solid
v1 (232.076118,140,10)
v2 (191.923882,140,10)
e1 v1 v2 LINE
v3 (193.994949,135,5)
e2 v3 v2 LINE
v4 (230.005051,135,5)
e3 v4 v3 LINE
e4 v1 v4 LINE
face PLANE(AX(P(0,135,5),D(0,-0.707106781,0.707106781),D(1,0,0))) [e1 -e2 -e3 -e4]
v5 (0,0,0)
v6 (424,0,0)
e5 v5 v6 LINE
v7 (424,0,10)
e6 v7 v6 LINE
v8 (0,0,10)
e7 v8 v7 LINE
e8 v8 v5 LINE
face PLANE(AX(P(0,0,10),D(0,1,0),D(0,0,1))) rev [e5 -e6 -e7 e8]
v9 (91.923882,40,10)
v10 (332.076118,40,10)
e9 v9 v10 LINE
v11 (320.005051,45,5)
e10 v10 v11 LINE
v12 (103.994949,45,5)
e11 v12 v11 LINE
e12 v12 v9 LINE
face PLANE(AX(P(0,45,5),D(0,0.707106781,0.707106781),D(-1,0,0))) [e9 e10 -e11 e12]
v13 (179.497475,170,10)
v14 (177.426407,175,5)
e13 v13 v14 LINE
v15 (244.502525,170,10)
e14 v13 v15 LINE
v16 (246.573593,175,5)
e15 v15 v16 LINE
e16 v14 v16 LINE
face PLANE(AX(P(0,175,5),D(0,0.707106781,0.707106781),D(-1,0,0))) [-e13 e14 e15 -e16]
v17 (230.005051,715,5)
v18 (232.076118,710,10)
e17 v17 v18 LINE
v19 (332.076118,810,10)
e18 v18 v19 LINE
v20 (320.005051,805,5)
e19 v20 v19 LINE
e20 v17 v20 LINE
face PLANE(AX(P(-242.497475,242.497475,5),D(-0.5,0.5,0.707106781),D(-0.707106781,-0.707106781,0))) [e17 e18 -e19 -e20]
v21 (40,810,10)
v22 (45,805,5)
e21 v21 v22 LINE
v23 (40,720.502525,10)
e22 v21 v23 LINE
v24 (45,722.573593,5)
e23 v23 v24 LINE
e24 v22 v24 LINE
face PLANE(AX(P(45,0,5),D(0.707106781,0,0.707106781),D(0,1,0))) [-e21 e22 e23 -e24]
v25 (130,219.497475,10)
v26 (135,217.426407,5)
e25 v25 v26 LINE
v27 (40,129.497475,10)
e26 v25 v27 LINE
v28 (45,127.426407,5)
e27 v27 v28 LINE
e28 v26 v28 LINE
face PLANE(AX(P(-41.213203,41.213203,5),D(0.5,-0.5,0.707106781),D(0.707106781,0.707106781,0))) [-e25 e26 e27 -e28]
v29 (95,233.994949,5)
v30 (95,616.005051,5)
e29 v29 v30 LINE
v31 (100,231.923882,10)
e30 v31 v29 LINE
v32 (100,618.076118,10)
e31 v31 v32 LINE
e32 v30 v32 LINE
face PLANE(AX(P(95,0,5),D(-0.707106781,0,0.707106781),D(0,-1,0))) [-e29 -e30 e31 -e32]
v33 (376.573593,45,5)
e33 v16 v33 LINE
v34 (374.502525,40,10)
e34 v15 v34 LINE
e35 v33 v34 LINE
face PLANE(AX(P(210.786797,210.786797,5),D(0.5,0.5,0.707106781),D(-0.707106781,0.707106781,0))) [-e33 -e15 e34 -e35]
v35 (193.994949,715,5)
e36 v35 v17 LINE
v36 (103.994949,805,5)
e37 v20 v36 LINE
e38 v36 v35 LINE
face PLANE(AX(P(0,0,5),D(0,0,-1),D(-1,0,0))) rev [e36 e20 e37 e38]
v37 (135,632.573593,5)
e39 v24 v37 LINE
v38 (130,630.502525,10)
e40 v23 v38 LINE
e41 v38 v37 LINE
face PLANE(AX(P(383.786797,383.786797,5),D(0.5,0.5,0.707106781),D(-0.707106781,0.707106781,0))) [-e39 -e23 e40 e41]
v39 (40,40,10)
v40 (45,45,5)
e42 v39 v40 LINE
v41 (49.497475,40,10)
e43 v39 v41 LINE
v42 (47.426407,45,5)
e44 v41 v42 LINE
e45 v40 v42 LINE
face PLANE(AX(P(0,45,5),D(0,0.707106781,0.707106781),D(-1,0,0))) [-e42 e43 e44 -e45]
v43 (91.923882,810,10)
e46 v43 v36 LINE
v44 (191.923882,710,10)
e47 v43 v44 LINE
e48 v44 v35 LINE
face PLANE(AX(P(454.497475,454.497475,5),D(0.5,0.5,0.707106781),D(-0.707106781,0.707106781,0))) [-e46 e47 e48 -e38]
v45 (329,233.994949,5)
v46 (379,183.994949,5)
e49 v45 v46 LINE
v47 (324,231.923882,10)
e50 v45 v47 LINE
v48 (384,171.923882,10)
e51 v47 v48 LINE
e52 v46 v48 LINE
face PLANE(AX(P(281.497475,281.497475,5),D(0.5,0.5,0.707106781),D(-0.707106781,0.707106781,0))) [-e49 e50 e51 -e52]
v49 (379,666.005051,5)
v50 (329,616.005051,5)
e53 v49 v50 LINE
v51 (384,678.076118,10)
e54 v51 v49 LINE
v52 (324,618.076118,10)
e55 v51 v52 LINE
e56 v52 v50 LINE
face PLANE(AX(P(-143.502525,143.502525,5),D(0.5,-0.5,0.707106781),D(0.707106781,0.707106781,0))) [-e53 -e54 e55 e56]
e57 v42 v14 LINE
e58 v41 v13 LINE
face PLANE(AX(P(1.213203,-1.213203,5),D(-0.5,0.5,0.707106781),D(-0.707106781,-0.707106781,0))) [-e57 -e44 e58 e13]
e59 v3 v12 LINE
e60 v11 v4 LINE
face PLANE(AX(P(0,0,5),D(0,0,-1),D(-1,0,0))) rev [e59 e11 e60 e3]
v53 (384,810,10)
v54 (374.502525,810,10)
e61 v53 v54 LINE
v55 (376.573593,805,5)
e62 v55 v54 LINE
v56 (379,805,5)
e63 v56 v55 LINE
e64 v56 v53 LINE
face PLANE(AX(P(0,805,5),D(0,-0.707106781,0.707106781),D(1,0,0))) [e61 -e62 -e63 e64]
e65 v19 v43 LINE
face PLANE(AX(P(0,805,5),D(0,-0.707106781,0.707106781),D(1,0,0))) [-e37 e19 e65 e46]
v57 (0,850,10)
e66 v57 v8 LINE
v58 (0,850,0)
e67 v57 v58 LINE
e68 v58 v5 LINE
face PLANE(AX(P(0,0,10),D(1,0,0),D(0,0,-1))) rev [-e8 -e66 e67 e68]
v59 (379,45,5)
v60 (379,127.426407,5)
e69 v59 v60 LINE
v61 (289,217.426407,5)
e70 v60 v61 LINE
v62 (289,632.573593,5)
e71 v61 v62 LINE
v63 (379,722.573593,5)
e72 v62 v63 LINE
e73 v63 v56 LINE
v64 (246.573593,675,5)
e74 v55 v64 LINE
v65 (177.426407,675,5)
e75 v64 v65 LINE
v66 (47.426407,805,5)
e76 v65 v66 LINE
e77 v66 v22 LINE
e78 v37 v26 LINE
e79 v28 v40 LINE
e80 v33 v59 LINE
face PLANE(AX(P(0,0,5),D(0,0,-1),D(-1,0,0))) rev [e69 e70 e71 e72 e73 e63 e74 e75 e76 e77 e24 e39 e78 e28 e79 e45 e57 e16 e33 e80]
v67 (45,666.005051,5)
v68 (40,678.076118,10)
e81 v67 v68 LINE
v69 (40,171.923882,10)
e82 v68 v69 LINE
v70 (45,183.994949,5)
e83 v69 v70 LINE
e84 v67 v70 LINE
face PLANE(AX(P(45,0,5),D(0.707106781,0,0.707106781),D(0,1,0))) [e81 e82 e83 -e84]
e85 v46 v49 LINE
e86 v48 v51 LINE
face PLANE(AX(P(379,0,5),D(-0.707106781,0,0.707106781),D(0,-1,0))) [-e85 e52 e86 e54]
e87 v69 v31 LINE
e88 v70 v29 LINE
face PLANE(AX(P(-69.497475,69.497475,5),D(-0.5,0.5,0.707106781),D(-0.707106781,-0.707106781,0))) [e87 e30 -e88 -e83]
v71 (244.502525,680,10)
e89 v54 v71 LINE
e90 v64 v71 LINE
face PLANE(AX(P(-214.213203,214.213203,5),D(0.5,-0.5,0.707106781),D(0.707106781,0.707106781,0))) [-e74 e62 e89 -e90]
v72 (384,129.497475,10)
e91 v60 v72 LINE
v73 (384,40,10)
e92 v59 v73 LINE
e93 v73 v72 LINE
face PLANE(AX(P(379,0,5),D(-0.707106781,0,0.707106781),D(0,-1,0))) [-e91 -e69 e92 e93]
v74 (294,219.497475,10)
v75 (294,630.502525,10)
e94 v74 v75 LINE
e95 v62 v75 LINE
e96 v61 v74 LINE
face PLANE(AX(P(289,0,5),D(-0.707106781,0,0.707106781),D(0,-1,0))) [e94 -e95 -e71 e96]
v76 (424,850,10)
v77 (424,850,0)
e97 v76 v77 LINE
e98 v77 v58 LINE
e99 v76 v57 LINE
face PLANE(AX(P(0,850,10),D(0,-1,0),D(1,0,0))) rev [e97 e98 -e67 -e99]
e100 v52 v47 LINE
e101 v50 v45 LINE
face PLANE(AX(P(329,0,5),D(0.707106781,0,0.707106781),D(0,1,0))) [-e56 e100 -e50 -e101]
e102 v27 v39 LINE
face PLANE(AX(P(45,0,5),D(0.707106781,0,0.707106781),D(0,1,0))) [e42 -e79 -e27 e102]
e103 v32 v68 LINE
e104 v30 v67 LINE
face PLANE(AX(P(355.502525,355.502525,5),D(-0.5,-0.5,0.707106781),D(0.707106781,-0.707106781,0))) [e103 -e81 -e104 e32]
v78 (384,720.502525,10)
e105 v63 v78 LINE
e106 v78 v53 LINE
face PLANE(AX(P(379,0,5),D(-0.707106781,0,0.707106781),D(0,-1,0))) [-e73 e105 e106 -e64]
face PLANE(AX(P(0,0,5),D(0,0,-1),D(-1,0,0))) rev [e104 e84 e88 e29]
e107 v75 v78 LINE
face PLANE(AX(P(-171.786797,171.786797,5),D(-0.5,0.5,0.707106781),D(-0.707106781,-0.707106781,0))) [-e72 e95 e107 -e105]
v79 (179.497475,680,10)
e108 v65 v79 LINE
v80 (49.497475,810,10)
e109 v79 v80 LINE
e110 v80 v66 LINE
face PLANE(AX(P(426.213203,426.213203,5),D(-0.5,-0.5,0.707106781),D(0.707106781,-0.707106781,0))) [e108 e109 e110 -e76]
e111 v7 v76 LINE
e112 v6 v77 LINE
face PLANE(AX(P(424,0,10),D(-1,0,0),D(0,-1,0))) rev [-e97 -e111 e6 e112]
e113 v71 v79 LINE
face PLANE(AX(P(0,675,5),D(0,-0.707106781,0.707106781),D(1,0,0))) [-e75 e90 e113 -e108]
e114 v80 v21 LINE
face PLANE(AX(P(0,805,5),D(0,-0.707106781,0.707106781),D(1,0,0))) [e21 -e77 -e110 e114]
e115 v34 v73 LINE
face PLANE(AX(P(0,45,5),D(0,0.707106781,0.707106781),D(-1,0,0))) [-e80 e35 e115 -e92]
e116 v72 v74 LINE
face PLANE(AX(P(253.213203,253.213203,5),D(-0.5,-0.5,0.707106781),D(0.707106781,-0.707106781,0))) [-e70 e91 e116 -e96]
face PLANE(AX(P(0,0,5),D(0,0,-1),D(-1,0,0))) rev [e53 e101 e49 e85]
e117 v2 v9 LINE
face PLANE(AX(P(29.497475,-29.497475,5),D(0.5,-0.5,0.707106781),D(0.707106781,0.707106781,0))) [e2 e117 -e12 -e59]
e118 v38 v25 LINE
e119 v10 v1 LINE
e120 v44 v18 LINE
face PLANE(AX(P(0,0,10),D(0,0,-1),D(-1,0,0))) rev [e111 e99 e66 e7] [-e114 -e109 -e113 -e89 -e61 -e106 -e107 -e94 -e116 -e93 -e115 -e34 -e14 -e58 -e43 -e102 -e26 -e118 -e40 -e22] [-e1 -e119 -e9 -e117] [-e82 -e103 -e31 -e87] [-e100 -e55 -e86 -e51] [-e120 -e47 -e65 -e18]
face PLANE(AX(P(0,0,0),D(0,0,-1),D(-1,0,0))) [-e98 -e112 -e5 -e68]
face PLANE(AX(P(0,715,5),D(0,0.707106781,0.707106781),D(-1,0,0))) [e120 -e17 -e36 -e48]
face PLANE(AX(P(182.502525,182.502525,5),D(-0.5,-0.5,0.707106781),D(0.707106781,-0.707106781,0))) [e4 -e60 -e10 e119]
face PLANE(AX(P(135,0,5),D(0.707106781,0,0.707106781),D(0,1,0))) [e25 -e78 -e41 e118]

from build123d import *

# Parameters (mm, degrees)
ESQUISSE1_W             = 424
ESQUISSE1_H             = 850
BOSS_EXTRU_1_DEPTH      = 10
ENL_V_MAT_EXTRU_1_DEPTH = 5
CHANFREIN1_SIZE         = 5


with BuildPart() as part:
    # Esquisse1 → Boss.-Extru.1 (new body)
    with BuildSketch(Plane.XY):
        with Locations((212, 425)):
            Rectangle(ESQUISSE1_W, ESQUISSE1_H)
    extrude(amount=BOSS_EXTRU_1_DEPTH)

    # Esquisse2 → Enlèv. mat.-Extru.1 (cut)
    with BuildSketch(Plane.XY.offset(10)):
        Polygon((100, 231.923881554), (100, 618.076118446), (40, 678.076118446), (40, 171.923881554), align=None)
        Polygon((191.923881554, 710), (232.076118446, 710), (332.076118446, 810), (91.923881554, 810), align=None)
        Polygon((40, 810), (40, 720.502525317), (130, 630.502525317), (130, 219.497474683), (40, 129.497474683), (40, 40), (49.497474683, 40), (179.497474683, 170), (244.502525317, 170), (374.502525317, 40), (384, 40), (384, 129.497474683), (294, 219.497474683), (294, 630.502525317), (384, 720.502525317), (384, 810), (374.502525317, 810), (244.502525317, 680), (179.497474683, 680), (49.497474683, 810), align=None)
        Polygon((324, 231.923881554), (324, 618.076118446), (384, 678.076118446), (384, 171.923881554), align=None)
        Polygon((332.076118446, 40), (91.923881554, 40), (191.923881554, 140), (232.076118446, 140), align=None)
    extrude(amount=-ENL_V_MAT_EXTRU_1_DEPTH, mode=Mode.SUBTRACT)

    # Chanfrein1
    chanfrein1_edges = [part.edges().sort_by_distance(p)[0] for p in [
        (212, 40, 5),
        (141.923881554, 90, 5),
        (212, 140, 5),
        (282.076118446, 90, 5),
        (40, 425, 5),
        (70, 648.076118446, 5),
        (100, 425, 5),
        (70, 201.923881554, 5),
        (384, 425, 5),
        (354, 201.923881554, 5),
        (324, 425, 5),
        (354, 648.076118446, 5),
        (114.497474683, 745, 5),
        (212, 680, 5),
        (309.502525317, 745, 5),
        (379.251262658, 810, 5),
        (384, 765.251262658, 5),
        (339, 675.502525317, 5),
        (294, 425, 5),
        (339, 174.497474683, 5),
        (384, 84.748737342, 5),
        (379.251262658, 40, 5),
        (309.502525317, 105, 5),
        (212, 170, 5),
        (114.497474683, 105, 5),
        (44.748737342, 40, 5),
        (40, 84.748737342, 5),
        (85, 174.497474683, 5),
        (130, 425, 5),
        (85, 675.502525317, 5),
        (40, 765.251262658, 5),
        (44.748737342, 810, 5),
        (212, 810, 5),
        (282.076118446, 760, 5),
        (212, 710, 5),
        (141.923881554, 760, 5),
    ]]
    chamfer(chanfrein1_edges, length=CHANFREIN1_SIZE - 0.0001)  # a hair under: the kernel refuses the full size


solid = part.part
